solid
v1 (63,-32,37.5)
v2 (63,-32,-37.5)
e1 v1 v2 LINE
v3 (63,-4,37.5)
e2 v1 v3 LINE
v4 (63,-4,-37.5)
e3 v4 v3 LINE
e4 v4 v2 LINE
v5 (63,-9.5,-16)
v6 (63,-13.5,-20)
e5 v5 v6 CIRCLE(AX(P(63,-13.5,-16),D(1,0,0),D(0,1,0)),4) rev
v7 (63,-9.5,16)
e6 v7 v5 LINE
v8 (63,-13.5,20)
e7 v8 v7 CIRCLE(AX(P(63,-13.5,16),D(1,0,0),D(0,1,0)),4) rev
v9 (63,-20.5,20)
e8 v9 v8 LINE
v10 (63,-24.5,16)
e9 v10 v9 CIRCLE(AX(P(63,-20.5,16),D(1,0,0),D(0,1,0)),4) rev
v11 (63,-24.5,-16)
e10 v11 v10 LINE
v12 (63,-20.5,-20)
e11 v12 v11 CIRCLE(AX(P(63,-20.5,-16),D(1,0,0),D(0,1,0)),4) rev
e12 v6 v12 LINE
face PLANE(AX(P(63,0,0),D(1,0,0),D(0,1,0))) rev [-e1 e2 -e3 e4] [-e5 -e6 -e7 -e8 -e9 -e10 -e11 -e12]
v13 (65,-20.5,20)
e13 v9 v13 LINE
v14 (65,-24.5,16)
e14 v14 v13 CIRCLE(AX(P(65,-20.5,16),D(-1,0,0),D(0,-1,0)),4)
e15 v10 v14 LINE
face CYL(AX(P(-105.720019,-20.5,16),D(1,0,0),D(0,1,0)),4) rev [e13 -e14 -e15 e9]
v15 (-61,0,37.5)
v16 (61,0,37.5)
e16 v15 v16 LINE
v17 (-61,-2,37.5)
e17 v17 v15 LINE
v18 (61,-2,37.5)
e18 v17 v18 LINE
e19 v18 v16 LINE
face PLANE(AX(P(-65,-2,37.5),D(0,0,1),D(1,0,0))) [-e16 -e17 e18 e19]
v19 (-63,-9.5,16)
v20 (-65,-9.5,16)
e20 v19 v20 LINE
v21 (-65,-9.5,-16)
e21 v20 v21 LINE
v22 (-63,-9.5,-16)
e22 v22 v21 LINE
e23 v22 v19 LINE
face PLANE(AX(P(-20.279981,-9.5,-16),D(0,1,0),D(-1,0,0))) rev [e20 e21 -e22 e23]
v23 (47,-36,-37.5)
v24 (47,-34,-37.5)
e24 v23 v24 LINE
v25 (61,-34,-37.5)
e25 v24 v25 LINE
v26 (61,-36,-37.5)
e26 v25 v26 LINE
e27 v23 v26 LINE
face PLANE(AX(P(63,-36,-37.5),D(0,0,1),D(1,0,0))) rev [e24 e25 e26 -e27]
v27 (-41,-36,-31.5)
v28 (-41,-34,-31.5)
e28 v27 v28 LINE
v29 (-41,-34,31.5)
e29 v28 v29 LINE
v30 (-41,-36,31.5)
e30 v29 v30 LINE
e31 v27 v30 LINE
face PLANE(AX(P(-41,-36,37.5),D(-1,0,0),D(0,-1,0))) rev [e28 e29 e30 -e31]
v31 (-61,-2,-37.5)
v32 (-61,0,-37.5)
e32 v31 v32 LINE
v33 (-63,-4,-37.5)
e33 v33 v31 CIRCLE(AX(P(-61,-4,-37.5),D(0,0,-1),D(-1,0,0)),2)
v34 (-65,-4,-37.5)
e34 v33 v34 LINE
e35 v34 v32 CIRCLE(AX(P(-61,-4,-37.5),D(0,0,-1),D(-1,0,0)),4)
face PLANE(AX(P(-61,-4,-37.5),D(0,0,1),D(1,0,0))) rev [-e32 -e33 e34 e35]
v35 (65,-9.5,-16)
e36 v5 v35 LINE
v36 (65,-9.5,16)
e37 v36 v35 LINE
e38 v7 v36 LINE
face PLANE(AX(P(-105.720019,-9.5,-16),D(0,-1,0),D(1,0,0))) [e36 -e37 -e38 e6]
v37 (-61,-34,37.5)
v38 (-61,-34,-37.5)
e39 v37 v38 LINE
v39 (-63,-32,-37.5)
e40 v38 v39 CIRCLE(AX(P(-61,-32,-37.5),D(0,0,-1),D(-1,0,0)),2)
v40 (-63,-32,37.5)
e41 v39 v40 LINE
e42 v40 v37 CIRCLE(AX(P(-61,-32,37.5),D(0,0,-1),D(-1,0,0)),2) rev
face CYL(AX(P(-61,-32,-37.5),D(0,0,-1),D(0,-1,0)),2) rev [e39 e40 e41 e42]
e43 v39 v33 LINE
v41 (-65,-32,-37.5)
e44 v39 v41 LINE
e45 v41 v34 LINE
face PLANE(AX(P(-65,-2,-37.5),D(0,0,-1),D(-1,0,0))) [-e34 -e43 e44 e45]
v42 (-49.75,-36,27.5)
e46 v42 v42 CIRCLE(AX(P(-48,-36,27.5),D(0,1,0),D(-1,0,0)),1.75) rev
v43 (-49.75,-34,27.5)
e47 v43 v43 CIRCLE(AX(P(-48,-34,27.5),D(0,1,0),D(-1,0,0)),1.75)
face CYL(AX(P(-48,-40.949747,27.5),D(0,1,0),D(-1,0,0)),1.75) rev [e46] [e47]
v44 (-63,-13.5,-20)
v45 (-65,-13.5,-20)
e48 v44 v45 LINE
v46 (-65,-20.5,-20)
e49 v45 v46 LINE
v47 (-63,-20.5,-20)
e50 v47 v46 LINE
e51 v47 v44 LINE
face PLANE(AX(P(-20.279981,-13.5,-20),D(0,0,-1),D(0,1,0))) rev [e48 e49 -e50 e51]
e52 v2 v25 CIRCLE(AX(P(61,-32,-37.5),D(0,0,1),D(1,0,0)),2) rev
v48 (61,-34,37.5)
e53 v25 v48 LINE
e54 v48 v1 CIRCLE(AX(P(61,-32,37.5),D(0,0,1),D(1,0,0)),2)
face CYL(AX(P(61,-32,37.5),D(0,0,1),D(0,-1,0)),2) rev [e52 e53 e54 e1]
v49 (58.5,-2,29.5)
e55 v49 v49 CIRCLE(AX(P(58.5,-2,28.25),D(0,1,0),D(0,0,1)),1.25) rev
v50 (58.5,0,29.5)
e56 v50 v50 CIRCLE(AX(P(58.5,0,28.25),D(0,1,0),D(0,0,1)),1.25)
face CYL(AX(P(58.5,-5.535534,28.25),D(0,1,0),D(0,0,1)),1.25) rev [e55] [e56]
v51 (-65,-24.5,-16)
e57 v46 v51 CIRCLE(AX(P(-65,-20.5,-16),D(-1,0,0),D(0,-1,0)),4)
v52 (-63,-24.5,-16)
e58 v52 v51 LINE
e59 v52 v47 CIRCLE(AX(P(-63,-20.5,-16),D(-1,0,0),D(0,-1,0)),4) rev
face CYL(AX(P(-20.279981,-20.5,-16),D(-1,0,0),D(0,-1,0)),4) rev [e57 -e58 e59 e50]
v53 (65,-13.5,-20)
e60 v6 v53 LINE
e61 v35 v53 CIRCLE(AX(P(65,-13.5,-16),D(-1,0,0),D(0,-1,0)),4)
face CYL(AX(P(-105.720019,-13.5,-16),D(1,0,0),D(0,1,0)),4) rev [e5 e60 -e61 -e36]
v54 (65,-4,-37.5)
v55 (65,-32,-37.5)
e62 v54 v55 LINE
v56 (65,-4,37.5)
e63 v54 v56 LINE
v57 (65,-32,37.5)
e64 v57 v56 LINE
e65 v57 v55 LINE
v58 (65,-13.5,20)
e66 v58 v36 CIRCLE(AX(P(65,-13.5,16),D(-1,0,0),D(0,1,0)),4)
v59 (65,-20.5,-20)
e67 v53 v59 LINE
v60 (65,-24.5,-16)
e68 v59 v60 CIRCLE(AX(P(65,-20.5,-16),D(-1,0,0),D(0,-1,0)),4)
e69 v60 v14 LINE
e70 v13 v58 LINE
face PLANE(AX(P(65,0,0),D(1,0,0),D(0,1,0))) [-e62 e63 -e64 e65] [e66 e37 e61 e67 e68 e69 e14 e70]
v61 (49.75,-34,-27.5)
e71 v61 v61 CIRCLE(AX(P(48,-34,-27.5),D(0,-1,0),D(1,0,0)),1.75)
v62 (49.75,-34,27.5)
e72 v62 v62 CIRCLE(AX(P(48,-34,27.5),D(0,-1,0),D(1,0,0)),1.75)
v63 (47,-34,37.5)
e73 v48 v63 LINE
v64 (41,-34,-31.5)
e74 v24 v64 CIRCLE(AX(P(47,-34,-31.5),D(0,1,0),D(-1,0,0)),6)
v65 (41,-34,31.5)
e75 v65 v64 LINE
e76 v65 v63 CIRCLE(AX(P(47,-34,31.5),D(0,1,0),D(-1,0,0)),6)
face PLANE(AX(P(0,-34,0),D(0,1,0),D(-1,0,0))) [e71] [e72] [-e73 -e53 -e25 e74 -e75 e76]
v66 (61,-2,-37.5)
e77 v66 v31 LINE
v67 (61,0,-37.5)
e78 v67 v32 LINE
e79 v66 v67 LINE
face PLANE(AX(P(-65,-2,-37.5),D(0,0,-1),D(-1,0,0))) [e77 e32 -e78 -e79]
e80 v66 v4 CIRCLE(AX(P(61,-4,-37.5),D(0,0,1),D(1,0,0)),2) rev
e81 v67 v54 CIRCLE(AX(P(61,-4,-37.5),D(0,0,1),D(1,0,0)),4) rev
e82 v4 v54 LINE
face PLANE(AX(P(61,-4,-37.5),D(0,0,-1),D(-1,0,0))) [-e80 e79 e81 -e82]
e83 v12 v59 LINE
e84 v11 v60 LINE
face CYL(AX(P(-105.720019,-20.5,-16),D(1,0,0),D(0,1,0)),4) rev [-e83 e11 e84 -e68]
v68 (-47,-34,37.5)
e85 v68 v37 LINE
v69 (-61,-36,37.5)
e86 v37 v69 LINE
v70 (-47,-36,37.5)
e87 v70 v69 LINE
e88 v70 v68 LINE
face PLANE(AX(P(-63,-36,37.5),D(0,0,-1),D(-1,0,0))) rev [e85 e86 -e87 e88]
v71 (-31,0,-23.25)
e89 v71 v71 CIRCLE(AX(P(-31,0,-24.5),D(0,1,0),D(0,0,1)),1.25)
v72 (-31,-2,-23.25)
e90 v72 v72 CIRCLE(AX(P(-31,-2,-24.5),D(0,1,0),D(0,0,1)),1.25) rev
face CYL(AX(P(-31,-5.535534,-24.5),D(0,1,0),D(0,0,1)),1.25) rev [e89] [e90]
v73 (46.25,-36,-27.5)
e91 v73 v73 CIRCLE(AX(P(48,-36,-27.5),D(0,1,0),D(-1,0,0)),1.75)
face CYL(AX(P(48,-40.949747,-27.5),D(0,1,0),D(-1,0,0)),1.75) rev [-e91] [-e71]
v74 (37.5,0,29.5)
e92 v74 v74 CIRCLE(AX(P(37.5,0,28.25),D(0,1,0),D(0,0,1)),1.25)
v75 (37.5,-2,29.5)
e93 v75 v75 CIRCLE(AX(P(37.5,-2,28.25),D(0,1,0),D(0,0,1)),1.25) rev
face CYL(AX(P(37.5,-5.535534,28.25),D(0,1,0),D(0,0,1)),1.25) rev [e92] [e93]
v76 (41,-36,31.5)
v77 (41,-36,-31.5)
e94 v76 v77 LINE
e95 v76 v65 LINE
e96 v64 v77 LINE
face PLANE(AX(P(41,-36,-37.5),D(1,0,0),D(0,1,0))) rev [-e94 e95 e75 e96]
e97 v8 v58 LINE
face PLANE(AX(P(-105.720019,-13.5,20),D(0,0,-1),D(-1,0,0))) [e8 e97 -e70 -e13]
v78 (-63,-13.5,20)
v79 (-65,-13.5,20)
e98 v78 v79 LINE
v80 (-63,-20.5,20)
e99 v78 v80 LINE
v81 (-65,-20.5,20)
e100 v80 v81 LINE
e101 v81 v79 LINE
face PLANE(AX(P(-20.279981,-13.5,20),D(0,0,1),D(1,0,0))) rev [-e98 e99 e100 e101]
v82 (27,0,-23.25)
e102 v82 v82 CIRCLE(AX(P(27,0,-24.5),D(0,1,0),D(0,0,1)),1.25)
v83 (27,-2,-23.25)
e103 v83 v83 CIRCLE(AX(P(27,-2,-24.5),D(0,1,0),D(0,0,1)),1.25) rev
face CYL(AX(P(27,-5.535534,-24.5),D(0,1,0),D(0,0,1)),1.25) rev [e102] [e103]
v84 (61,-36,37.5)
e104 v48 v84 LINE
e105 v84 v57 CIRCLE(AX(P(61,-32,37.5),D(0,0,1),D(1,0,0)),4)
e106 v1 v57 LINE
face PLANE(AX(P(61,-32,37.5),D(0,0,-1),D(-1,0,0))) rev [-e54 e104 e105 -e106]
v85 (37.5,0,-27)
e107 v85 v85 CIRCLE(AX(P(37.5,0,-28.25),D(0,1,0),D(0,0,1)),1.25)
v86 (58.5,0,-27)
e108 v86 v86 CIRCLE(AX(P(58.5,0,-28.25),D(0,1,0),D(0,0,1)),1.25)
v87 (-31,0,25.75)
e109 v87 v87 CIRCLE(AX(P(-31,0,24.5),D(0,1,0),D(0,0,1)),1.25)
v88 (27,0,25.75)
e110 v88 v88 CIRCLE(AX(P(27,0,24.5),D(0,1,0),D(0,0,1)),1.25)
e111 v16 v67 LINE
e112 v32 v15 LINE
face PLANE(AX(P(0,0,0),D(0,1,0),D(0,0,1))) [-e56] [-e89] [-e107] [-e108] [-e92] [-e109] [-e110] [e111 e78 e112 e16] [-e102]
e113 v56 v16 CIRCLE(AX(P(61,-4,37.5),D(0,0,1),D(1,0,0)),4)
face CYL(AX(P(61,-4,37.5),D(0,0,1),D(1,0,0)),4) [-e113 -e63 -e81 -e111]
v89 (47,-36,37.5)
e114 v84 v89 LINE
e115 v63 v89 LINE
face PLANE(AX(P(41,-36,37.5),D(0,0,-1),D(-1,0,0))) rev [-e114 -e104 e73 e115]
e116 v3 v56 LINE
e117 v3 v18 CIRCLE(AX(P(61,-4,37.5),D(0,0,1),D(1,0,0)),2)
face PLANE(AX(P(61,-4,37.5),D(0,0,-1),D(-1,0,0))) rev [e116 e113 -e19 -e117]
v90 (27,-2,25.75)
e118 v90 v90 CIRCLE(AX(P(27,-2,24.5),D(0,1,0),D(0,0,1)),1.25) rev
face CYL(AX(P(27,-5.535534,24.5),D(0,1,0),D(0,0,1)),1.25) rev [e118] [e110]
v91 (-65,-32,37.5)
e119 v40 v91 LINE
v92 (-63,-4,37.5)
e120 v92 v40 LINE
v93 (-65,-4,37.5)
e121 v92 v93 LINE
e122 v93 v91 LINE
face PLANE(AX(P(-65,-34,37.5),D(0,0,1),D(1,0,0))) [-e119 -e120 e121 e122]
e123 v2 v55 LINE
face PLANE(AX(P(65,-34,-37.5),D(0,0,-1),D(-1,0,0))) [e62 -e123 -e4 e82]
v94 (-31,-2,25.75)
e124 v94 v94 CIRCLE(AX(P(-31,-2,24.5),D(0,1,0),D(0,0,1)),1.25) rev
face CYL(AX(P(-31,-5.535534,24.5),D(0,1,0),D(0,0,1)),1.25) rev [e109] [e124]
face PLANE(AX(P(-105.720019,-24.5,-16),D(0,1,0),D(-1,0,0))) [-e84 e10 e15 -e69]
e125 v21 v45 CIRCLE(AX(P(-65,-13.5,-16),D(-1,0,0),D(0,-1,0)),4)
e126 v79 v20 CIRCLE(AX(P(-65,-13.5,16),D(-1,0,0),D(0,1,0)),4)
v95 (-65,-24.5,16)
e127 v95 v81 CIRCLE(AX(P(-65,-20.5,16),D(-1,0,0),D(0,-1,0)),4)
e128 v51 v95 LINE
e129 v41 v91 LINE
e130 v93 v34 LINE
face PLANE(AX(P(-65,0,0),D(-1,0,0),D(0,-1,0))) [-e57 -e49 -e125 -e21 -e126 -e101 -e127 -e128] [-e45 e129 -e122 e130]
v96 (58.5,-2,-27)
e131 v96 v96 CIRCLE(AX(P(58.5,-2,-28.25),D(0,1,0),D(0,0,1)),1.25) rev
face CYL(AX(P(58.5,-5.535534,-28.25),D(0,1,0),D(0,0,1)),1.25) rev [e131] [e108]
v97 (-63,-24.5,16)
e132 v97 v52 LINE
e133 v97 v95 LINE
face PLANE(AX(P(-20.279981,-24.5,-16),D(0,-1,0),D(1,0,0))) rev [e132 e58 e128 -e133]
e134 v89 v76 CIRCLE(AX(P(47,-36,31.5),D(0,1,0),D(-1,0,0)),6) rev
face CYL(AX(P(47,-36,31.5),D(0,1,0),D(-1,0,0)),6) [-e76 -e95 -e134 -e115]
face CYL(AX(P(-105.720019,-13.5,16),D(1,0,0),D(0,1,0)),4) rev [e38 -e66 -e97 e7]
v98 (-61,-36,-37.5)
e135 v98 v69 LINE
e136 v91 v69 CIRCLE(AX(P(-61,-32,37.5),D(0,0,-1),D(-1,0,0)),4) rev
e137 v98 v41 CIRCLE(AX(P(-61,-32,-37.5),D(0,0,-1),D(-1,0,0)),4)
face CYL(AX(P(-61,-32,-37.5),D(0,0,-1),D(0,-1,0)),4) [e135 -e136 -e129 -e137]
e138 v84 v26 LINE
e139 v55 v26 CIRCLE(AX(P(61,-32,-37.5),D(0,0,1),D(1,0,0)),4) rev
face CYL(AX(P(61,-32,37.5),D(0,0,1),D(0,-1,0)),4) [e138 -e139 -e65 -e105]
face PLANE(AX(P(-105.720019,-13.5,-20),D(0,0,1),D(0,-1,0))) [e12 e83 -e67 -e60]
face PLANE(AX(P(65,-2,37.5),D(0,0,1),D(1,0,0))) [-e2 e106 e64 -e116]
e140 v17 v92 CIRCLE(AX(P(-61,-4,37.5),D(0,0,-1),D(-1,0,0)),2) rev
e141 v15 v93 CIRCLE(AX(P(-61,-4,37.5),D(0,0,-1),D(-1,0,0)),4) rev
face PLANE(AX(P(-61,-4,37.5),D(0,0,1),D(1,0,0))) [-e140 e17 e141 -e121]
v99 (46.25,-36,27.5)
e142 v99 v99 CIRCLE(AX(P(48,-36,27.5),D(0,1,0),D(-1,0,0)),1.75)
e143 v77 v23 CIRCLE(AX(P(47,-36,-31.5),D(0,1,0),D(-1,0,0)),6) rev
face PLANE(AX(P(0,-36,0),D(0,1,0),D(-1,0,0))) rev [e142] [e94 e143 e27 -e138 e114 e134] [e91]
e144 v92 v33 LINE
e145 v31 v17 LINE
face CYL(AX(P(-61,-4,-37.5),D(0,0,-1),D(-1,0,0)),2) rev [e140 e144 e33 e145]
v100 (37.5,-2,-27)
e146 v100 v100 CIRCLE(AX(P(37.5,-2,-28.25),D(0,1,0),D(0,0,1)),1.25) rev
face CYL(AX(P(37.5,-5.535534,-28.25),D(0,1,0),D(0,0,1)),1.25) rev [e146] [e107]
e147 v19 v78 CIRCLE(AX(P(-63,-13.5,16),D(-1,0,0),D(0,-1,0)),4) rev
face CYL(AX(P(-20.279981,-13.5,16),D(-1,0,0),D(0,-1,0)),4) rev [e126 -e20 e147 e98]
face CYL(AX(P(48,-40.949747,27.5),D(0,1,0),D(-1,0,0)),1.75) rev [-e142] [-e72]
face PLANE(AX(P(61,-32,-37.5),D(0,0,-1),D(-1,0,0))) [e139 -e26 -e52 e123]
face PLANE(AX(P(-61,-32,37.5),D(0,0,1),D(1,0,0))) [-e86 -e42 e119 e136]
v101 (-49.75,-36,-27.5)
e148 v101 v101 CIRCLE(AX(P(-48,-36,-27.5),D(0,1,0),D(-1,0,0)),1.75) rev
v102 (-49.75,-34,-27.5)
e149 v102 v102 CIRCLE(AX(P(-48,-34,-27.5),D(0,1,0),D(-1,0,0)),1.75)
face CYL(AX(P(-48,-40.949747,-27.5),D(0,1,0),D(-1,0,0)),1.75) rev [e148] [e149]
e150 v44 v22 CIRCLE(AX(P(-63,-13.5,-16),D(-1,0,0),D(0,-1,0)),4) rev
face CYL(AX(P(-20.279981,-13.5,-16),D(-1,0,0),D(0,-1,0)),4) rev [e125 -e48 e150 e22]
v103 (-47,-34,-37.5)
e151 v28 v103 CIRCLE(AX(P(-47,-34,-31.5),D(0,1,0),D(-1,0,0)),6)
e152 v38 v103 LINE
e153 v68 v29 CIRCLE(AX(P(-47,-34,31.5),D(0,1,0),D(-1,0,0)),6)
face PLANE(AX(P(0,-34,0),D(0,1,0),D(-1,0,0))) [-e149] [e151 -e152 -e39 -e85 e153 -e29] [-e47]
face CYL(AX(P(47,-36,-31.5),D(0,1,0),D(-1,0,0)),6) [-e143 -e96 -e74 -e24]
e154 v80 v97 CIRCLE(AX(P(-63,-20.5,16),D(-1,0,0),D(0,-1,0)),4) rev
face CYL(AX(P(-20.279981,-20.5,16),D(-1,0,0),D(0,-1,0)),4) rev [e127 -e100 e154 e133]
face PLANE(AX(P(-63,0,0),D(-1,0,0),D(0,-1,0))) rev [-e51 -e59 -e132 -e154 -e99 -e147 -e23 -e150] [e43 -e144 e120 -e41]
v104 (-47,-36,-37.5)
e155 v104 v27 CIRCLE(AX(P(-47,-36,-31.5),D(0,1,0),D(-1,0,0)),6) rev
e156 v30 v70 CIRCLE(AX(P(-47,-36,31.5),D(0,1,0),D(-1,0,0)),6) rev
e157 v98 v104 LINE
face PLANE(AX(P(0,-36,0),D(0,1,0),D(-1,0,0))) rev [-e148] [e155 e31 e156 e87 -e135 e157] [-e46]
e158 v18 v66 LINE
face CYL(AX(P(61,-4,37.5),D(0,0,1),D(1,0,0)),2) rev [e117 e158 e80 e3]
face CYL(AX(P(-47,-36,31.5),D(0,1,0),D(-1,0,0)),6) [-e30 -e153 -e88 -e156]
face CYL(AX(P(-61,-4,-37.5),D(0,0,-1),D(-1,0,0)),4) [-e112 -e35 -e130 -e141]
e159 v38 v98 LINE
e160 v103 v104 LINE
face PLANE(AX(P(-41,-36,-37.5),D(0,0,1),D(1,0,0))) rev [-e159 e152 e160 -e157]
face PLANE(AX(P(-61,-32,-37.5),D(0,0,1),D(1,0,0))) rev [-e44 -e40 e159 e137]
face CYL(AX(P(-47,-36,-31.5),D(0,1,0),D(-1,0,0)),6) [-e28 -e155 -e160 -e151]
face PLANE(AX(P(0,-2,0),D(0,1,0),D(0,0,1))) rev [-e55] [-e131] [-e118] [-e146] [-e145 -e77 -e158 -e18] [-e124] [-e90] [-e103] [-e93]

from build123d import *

# Parameters (mm, degrees)
SKETCH1_W                    = 130
SKETCH1_H                    = 75
BASE_FLANGE1_DEPTH           = 2
EDGE_FLANGE1_STRIP_W         = 12
EDGE_FLANGE1_STRIP_H         = 2
EDGE_FLANGE1_STRIP_CUT_DEPTH = 75
EDGE_FLANGE1_DEPTH           = 75
EDGE_FLANGE2_STRIP_W         = 12
EDGE_FLANGE2_STRIP_H         = 2
EDGE_FLANGE2_STRIP_CUT_DEPTH = 75
EDGE_FLANGE2_DEPTH           = 75
EDGE_FLANGE3_STRIP_W         = 12
EDGE_FLANGE3_STRIP_H         = 2
EDGE_FLANGE3_STRIP_CUT_DEPTH = 75
EDGE_FLANGE3_DEPTH           = 75
EDGE_FLANGE4_STRIP_W         = 12
EDGE_FLANGE4_STRIP_H         = 2
EDGE_FLANGE4_STRIP_CUT_DEPTH = 75
EDGE_FLANGE4_DEPTH           = 75
SKETCH20_R                   = 1.75
CUT_EXTRUDE1_DEPTH           = 2
CUT_EXTRUDE2_DEPTH           = 128
FILLET1_R                    = 6
SKETCH22_R                   = 1.25
CUT_EXTRUDE3_DEPTH           = 2
SKETCH23_R                   = 1.25
CUT_EXTRUDE4_DEPTH           = 2


# Sheet-metal steps are written as plain solids
with BuildPart() as part:
    # Sketch1 → Base-Flange1 (new body)
    with BuildSketch(Plane(origin=(0, 0, 0), x_dir=(1, 0, 0), z_dir=(0, 1, 0))):
        Rectangle(SKETCH1_W, SKETCH1_H)
    extrude(amount=-BASE_FLANGE1_DEPTH)

    # Edge-Flange1 strip (across the edge) → Edge-Flange1 strip cut (cut)
    with BuildSketch(Plane(origin=(-65, -2, 37.5), x_dir=(1, 0, 0), z_dir=(0, 0, -1))):
        with Locations((-2, -1)):
            Rectangle(EDGE_FLANGE1_STRIP_W, EDGE_FLANGE1_STRIP_H)
    extrude(amount=EDGE_FLANGE1_STRIP_CUT_DEPTH, mode=Mode.SUBTRACT)

    # Edge-Flange1 section (across the edge) → Edge-Flange1 (add)
    with BuildSketch(Plane(origin=(-65, -2, 37.5), x_dir=(1, 0, 0), z_dir=(0, 0, -1))):
        with BuildLine():
            Line((0, 2), (0, 32))
            Line((0, 32), (2, 32))
            Line((2, 32), (2, 2))
            ThreePointArc((2, 2), (2.585786438, 0.585786438), (4, 0))
            Line((4, 0), (4, -2))
            ThreePointArc((4, -2), (1.171572875, -0.828427125), (0, 2))
        make_face()
    extrude(amount=EDGE_FLANGE1_DEPTH)

    # Edge-Flange2 strip (across the edge) → Edge-Flange2 strip cut (cut)
    with BuildSketch(Plane(origin=(-63, -34, 37.5), x_dir=(0, 1, 0), z_dir=(0, 0, -1))):
        with Locations((-4, -1)):
            Rectangle(EDGE_FLANGE2_STRIP_W, EDGE_FLANGE2_STRIP_H)
    extrude(amount=EDGE_FLANGE2_STRIP_CUT_DEPTH, mode=Mode.SUBTRACT)

    # Edge-Flange2 section (across the edge) → Edge-Flange2 (add)
    with BuildSketch(Plane(origin=(-63, -34, 37.5), x_dir=(0, 1, 0), z_dir=(0, 0, -1))):
        with BuildLine():
            Line((-2, 2), (-2, 22))
            Line((-2, 22), (0, 22))
            Line((0, 22), (0, 2))
            ThreePointArc((0, 2), (0.585786438, 0.585786438), (2, 0))
            Line((2, 0), (2, -2))
            ThreePointArc((2, -2), (-0.828427125, -0.828427125), (-2, 2))
        make_face()
    extrude(amount=EDGE_FLANGE2_DEPTH)

    # Edge-Flange3 strip (across the edge) → Edge-Flange3 strip cut (cut)
    with BuildSketch(Plane(origin=(65, -2, -37.5), x_dir=(-1, 0, 0), z_dir=(0, 0, 1))):
        with Locations((-2, -1)):
            Rectangle(EDGE_FLANGE3_STRIP_W, EDGE_FLANGE3_STRIP_H)
    extrude(amount=EDGE_FLANGE3_STRIP_CUT_DEPTH, mode=Mode.SUBTRACT)

    # Edge-Flange3 section (across the edge) → Edge-Flange3 (add)
    with BuildSketch(Plane(origin=(65, -2, -37.5), x_dir=(-1, 0, 0), z_dir=(0, 0, 1))):
        with BuildLine():
            Line((0, 2), (0, 32))
            Line((0, 32), (2, 32))
            Line((2, 32), (2, 2))
            ThreePointArc((2, 2), (2.585786438, 0.585786438), (4, 0))
            Line((4, 0), (4, -2))
            ThreePointArc((4, -2), (1.171572875, -0.828427125), (0, 2))
        make_face()
    extrude(amount=EDGE_FLANGE3_DEPTH)

    # Edge-Flange4 strip (across the edge) → Edge-Flange4 strip cut (cut)
    with BuildSketch(Plane(origin=(63, -34, -37.5), x_dir=(0, 1, 0), z_dir=(0, 0, 1))):
        with Locations((-4, -1)):
            Rectangle(EDGE_FLANGE4_STRIP_W, EDGE_FLANGE4_STRIP_H)
    extrude(amount=EDGE_FLANGE4_STRIP_CUT_DEPTH, mode=Mode.SUBTRACT)

    # Edge-Flange4 section (across the edge) → Edge-Flange4 (add)
    with BuildSketch(Plane(origin=(63, -34, -37.5), x_dir=(0, 1, 0), z_dir=(0, 0, 1))):
        with BuildLine():
            Line((-2, 2), (-2, 22))
            Line((-2, 22), (0, 22))
            Line((0, 22), (0, 2))
            ThreePointArc((0, 2), (0.585786438, 0.585786438), (2, 0))
            Line((2, 0), (2, -2))
            ThreePointArc((2, -2), (-0.828427125, -0.828427125), (-2, 2))
        make_face()
    extrude(amount=EDGE_FLANGE4_DEPTH)

    # Sketch20 → Cut-Extrude1 (cut)
    with BuildSketch(Plane(origin=(0, -34, 0), x_dir=(1, 0, 0), z_dir=(0, 1, 0))):
        with Locations(Location((-48, -27.5, 0), (0, 0, 180))):
            Circle(SKETCH20_R)
        with Locations(Location((-48, 27.5, 0), (0, 0, 180))):
            Circle(SKETCH20_R)
    cut_extrude1 = extrude(amount=-CUT_EXTRUDE1_DEPTH, mode=Mode.SUBTRACT)

    # Sketch21 → Cut-Extrude2 (cut)
    with BuildSketch(Plane.ZY.offset(65)):
        with BuildLine():
            Line((-16, -9.5), (16, -9.5))
            ThreePointArc((16, -9.5), (18.828427125, -10.671572875), (20, -13.5))
            Line((20, -13.5), (20, -20.5))
            ThreePointArc((20, -20.5), (18.828427125, -23.328427125), (16, -24.5))
            Line((16, -24.5), (-16, -24.5))
            ThreePointArc((-16, -24.5), (-18.828427125, -23.328427125), (-20, -20.5))
            Line((-20, -20.5), (-20, -13.5))
            ThreePointArc((-20, -13.5), (-18.828427125, -10.671572875), (-16, -9.5))
        make_face()
    cut_extrude2 = extrude(amount=-CUT_EXTRUDE2_DEPTH, mode=Mode.SUBTRACT)

    # Fillet1
    fillet1_edges = [part.edges().sort_by_distance(p)[0] for p in [
        (41, -35, -37.5),
        (41, -35, 37.5),
        (-41, -35, 37.5),
        (-41, -35, -37.5),
    ]]
    fillet(fillet1_edges, radius=FILLET1_R)

    # Mirror4: Cut-Extrude1, Cut-Extrude2 across plane
    add(cut_extrude1.mirror(Plane(origin=(0, 0, 0), x_dir=(0, 0, 1), z_dir=(1, 0, 0))), mode=Mode.SUBTRACT)
    add(cut_extrude2.mirror(Plane(origin=(0, 0, 0), x_dir=(0, 0, 1), z_dir=(1, 0, 0))), mode=Mode.SUBTRACT)

    # Sketch22 → Cut-Extrude3 (cut)
    with BuildSketch(Plane(origin=(0, 0, 0), x_dir=(1, 0, 0), z_dir=(0, 1, 0))):
        with BuildLine():
            Line((-31, 23.25), (-31, 24.5))
            Line((-31, 24.5), (-29.75, 24.5))
            ThreePointArc((-29.75, 24.5), (-31.883883476, 25.383883476), (-31, 23.25))
        make_face()
        with BuildLine():
            Line((-29.75, 24.5), (-31, 24.5))
            Line((-31, 24.5), (-31, 23.25))
            ThreePointArc((-31, 23.25), (-30.116116524, 23.616116524), (-29.75, 24.5))
        make_face()
        with Locations(Location((27, 24.5, 0), (0, 0, 270))):
            Circle(SKETCH22_R)
        with Locations(Location((27, -24.5, 0), (0, 0, 270))):
            Circle(SKETCH22_R)
        with Locations(Location((-31, -24.5, 0), (0, 0, 270))):
            Circle(SKETCH22_R)
    extrude(amount=-CUT_EXTRUDE3_DEPTH, mode=Mode.SUBTRACT)

    # Sketch23 → Cut-Extrude4 (cut)
    with BuildSketch(Plane(origin=(0, 0, 0), x_dir=(1, 0, 0), z_dir=(0, 1, 0))):
        with BuildLine():
            ThreePointArc((38.75, -28.25), (38.383883476, -27.366116524), (37.5, -27))
            Line((37.5, -27), (37.5, -28.25))
            Line((37.5, -28.25), (38.75, -28.25))
        make_face()
        with BuildLine():
            Line((37.5, -28.25), (37.5, -27))
            ThreePointArc((37.5, -27), (36.616116524, -29.133883476), (38.75, -28.25))
            Line((38.75, -28.25), (37.5, -28.25))
        make_face()
        with Locations(Location((37.5, 28.25, 0), (0, 0, 270))):
            Circle(SKETCH23_R)
        with Locations(Location((58.5, 28.25, 0), (0, 0, 270))):
            Circle(SKETCH23_R)
        with Locations(Location((58.5, -28.25, 0), (0, 0, 270))):
            Circle(SKETCH23_R)
    extrude(amount=-CUT_EXTRUDE4_DEPTH, mode=Mode.SUBTRACT)


solid = part.part
